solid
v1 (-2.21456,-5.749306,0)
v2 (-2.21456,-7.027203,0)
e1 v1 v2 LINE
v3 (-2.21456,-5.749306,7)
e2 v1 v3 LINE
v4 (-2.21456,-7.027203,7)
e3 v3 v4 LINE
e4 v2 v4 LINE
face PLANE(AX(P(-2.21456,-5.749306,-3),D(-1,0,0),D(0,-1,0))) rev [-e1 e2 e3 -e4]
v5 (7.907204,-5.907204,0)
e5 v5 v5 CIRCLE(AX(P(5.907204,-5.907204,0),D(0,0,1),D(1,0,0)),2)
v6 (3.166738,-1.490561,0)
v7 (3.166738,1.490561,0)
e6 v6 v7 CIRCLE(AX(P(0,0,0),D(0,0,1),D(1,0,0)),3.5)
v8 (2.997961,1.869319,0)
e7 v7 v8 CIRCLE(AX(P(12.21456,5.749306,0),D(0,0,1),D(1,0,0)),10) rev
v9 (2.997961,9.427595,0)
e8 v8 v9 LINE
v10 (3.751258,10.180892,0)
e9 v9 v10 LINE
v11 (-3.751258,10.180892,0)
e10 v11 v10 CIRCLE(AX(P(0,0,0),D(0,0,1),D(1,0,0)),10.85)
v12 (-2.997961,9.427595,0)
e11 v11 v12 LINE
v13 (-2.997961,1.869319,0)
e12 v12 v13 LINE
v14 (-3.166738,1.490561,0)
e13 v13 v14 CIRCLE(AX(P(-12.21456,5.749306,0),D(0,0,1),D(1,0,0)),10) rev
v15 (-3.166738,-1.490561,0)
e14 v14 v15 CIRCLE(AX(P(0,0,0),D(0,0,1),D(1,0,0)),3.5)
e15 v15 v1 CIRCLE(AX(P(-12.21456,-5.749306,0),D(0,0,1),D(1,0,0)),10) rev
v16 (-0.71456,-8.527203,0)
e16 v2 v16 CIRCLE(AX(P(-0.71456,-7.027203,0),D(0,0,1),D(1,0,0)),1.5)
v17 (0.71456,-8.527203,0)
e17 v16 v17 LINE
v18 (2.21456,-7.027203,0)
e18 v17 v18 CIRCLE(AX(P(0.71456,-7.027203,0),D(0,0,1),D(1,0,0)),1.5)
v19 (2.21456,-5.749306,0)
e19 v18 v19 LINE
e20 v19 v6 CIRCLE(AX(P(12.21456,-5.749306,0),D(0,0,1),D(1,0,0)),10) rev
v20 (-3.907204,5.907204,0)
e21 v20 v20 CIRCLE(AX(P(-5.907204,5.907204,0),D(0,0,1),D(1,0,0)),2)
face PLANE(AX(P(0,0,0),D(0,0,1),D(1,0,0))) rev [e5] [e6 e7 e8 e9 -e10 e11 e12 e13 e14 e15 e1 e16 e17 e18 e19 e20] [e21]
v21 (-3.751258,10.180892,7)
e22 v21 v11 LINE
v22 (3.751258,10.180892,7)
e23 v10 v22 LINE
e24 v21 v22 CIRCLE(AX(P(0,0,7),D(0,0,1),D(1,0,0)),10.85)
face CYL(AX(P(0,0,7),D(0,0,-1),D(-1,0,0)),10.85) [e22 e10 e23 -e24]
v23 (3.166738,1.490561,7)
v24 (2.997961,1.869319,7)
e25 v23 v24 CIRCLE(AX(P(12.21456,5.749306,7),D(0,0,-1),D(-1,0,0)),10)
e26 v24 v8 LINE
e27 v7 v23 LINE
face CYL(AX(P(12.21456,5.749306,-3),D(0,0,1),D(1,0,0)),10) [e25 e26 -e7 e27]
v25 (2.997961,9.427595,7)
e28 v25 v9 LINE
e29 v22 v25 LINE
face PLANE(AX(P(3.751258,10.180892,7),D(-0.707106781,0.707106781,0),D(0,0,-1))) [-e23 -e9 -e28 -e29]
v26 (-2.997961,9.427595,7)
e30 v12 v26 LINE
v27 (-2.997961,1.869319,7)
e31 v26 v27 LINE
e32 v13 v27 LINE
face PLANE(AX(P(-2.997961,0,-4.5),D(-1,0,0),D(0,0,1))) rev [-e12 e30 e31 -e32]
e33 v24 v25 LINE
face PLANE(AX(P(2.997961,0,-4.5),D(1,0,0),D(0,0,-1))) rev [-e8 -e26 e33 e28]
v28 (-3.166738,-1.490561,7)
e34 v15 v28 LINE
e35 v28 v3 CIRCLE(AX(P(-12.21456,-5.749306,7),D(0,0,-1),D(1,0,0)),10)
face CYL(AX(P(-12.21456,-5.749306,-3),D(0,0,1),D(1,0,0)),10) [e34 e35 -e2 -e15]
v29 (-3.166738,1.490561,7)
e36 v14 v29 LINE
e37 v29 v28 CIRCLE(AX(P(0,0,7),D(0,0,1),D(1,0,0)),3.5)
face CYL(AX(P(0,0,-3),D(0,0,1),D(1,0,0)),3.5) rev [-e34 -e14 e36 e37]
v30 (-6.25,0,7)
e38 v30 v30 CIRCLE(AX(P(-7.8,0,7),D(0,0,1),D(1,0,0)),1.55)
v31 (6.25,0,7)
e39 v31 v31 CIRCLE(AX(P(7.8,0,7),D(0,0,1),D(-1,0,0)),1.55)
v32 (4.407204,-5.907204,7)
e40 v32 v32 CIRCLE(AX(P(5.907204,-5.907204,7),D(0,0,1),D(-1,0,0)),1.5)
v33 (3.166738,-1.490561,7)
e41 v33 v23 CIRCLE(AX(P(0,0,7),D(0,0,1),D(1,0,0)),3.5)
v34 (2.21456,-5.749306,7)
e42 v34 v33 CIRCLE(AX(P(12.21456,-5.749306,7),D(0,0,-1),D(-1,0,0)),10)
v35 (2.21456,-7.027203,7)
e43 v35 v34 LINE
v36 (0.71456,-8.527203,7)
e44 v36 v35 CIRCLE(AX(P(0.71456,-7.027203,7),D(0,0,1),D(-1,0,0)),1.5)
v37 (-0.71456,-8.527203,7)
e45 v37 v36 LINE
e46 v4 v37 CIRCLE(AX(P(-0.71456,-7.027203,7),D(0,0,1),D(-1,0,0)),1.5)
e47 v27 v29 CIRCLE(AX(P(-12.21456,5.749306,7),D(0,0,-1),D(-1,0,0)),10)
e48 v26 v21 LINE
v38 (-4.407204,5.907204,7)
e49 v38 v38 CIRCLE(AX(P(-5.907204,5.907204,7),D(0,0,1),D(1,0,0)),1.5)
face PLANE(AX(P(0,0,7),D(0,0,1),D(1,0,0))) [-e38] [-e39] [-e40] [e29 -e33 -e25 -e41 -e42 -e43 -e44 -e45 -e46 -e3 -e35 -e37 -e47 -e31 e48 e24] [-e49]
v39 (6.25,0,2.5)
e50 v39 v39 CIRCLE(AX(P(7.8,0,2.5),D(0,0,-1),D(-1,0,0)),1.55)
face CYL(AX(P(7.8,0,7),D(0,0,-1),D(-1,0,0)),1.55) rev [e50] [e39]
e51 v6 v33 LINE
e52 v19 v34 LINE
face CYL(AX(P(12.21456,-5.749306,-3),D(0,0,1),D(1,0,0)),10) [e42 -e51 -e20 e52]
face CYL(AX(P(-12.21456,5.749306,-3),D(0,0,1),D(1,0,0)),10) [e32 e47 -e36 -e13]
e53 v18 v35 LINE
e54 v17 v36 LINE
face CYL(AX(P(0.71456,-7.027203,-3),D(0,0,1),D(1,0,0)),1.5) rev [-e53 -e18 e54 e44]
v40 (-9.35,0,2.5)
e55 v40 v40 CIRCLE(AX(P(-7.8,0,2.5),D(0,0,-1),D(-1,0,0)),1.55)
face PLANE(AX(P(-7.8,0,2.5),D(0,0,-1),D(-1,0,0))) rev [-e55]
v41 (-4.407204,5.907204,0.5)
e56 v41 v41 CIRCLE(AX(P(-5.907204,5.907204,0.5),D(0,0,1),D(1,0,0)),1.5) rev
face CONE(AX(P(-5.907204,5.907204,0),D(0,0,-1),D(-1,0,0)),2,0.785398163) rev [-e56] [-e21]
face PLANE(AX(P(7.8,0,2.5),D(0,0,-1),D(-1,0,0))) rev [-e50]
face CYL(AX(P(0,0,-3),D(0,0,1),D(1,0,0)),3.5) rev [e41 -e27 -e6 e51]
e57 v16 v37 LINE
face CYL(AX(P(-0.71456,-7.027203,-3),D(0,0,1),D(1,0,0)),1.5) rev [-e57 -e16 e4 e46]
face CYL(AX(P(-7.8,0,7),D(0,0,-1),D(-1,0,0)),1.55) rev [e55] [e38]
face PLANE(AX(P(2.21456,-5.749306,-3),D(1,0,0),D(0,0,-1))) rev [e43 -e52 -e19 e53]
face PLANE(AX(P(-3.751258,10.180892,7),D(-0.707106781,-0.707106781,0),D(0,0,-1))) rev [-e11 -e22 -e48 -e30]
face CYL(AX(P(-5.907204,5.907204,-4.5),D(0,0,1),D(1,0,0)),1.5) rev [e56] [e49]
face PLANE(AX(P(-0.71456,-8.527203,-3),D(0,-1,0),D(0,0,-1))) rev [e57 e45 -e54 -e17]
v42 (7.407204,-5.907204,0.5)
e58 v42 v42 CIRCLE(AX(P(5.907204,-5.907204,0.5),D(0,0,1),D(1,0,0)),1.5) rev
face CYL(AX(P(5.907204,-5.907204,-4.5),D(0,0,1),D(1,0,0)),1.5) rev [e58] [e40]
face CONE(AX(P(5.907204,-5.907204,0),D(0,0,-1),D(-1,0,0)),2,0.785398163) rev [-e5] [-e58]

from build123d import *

# Parameters (mm, degrees)
SKETCH1_R           = 10.85
SKETCH1_R_2         = 1.55
BOSS_EXTRUDE1_DEPTH = 7
CUT_EXTRUDE1_DEPTH  = 10
SKETCH3_R           = 1.55
BOSS_EXTRUDE2_DEPTH = 2.5
SKETCH6_W           = 5.995922228
SKETCH6_H           = 11.403727684
CUT_EXTRUDE3_DEPTH  = 11.5
CHAMFER2_SIZE       = 1
SKETCH7_R           = 1.5
CUT_EXTRUDE4_DEPTH  = 11.5
CHAMFER3_SIZE       = 0.5


with BuildPart() as part:
    # Sketch1 → Boss-Extrude1 (new body)
    with BuildSketch(Plane.XY):
        Circle(SKETCH1_R)
        with Locations((-7.8, 0)):
            Circle(SKETCH1_R_2, mode=Mode.SUBTRACT)
        with Locations(Location((7.8, 0, 0), (0, 0, 180))):
            Circle(SKETCH1_R_2, mode=Mode.SUBTRACT)
    extrude(amount=BOSS_EXTRUDE1_DEPTH)

    # Sketch2 → Cut-Extrude1 (cut)
    with BuildSketch(Plane.XY.offset(7)):
        with BuildLine():
            Line((-2.214560219, -5.749305929), (-2.214560219, -7.027203312))
            ThreePointArc((-2.214560219, -7.027203312), (-1.775220391, -8.087863484), (-0.714560219, -8.527203312))
            Line((-0.714560219, -8.527203312), (0.714560219, -8.527203312))
            ThreePointArc((0.714560219, -8.527203312), (1.775220391, -8.087863484), (2.214560219, -7.027203312))
            Line((2.214560219, -7.027203312), (2.214560219, -5.749305929))
            ThreePointArc((2.214560219, -5.749305929), (2.4555074, -3.56735999), (3.166737835, -1.490560796))
            ThreePointArc((3.166737835, -1.490560796), (3.5, 0), (3.166737835, 1.490560796))
            ThreePointArc((3.166737835, 1.490560796), (2.4555074, 3.56735999), (2.214560219, 5.749305929))
            Line((2.214560219, 5.749305929), (2.214560219, 8.304826852))
            ThreePointArc((2.214560219, 8.304826852), (1.775220391, 9.365487023), (0.714560219, 9.804826852))
            Line((0.714560219, 9.804826852), (-0.714560219, 9.804826852))
            ThreePointArc((-0.714560219, 9.804826852), (-1.775220391, 9.365487023), (-2.214560219, 8.304826852))
            Line((-2.214560219, 8.304826852), (-2.214560219, 5.749305929))
            ThreePointArc((-2.214560219, 5.749305929), (-2.4555074, 3.56735999), (-3.166737835, 1.490560796))
            ThreePointArc((-3.166737835, 1.490560796), (-3.5, 0), (-3.166737835, -1.490560796))
            ThreePointArc((-3.166737835, -1.490560796), (-2.4555074, -3.56735999), (-2.214560219, -5.749305929))
        make_face()
    extrude(amount=-CUT_EXTRUDE1_DEPTH, mode=Mode.SUBTRACT)

    # Sketch3 → Boss-Extrude2 (add)
    with BuildSketch(Plane(origin=(0, 0, 0), x_dir=(-1, 0, 0), z_dir=(0, 0, -1))):
        with Locations((-7.8, 0)):
            Circle(SKETCH3_R)
        with Locations((7.8, 0)):
            Circle(SKETCH3_R)
    extrude(amount=-BOSS_EXTRUDE2_DEPTH)

    # Sketch6 → Cut-Extrude3 (cut)
    with BuildSketch(Plane.XY.offset(7)):
        with Locations((0, 5.701863842)):
            Rectangle(SKETCH6_W, SKETCH6_H)
    extrude(amount=-CUT_EXTRUDE3_DEPTH, mode=Mode.SUBTRACT)

    # Chamfer2
    # the kernel refuses this chamfer: 1, 0.808160216 mm, written as the material it takes off along each edge
    with BuildSketch(Plane(origin=(-2.997961114, 10.427594601, 9.571682988), x_dir=(-0.9503340771083855, -0.3112316530922798, 0), z_dir=(0, 0, -1))) as chamfer2_piece_1:
        with BuildLine():
            Line((0.792665793, 0), (CHAMFER2_SIZE * 0.311231653092, -CHAMFER2_SIZE * 0.950334077108))
            Line((CHAMFER2_SIZE * 0.311231653092, -CHAMFER2_SIZE * 0.950334077108), (0, 0))
            ThreePointArc((0, 0), (0.405362345, 0.007237358), (0.792665793, 0))
        make_face()
    extrude(amount=12.143365976, mode=Mode.SUBTRACT)
    with BuildSketch(Plane(origin=(2.997961114, 10.427594601, 9.571682988), x_dir=(0.950334077108385, -0.31123165309228096, 0), z_dir=(0, 0, -1))) as chamfer2_piece_2:
        with BuildLine():
            Line((0.792665793, 0), (CHAMFER2_SIZE * 0.311231653092, CHAMFER2_SIZE * 0.950334077108))
            Line((CHAMFER2_SIZE * 0.311231653092, CHAMFER2_SIZE * 0.950334077108), (0, 0))
            ThreePointArc((0, 0), (0.405362345, -0.007237358), (0.792665793, 0))
        make_face()
    extrude(amount=12.143365976, mode=Mode.SUBTRACT)

    # Sketch7 → Cut-Extrude4 (cut)
    with BuildSketch(Plane.XY.offset(7)):
        with Locations((-5.907204398, 5.907204398)):
            Circle(SKETCH7_R)
        with Locations((5.907204398, -5.907204398)):
            Circle(SKETCH7_R)
    extrude(amount=-CUT_EXTRUDE4_DEPTH, mode=Mode.SUBTRACT)

    # Chamfer3
    chamfer3_edges = [part.edges().sort_by_distance(p)[0] for p in [
        (-7.407204398, 5.907204398, 0),
        (4.407204398, -5.907204398, 0),
    ]]
    chamfer(chamfer3_edges, length=CHAMFER3_SIZE)


solid = part.part
